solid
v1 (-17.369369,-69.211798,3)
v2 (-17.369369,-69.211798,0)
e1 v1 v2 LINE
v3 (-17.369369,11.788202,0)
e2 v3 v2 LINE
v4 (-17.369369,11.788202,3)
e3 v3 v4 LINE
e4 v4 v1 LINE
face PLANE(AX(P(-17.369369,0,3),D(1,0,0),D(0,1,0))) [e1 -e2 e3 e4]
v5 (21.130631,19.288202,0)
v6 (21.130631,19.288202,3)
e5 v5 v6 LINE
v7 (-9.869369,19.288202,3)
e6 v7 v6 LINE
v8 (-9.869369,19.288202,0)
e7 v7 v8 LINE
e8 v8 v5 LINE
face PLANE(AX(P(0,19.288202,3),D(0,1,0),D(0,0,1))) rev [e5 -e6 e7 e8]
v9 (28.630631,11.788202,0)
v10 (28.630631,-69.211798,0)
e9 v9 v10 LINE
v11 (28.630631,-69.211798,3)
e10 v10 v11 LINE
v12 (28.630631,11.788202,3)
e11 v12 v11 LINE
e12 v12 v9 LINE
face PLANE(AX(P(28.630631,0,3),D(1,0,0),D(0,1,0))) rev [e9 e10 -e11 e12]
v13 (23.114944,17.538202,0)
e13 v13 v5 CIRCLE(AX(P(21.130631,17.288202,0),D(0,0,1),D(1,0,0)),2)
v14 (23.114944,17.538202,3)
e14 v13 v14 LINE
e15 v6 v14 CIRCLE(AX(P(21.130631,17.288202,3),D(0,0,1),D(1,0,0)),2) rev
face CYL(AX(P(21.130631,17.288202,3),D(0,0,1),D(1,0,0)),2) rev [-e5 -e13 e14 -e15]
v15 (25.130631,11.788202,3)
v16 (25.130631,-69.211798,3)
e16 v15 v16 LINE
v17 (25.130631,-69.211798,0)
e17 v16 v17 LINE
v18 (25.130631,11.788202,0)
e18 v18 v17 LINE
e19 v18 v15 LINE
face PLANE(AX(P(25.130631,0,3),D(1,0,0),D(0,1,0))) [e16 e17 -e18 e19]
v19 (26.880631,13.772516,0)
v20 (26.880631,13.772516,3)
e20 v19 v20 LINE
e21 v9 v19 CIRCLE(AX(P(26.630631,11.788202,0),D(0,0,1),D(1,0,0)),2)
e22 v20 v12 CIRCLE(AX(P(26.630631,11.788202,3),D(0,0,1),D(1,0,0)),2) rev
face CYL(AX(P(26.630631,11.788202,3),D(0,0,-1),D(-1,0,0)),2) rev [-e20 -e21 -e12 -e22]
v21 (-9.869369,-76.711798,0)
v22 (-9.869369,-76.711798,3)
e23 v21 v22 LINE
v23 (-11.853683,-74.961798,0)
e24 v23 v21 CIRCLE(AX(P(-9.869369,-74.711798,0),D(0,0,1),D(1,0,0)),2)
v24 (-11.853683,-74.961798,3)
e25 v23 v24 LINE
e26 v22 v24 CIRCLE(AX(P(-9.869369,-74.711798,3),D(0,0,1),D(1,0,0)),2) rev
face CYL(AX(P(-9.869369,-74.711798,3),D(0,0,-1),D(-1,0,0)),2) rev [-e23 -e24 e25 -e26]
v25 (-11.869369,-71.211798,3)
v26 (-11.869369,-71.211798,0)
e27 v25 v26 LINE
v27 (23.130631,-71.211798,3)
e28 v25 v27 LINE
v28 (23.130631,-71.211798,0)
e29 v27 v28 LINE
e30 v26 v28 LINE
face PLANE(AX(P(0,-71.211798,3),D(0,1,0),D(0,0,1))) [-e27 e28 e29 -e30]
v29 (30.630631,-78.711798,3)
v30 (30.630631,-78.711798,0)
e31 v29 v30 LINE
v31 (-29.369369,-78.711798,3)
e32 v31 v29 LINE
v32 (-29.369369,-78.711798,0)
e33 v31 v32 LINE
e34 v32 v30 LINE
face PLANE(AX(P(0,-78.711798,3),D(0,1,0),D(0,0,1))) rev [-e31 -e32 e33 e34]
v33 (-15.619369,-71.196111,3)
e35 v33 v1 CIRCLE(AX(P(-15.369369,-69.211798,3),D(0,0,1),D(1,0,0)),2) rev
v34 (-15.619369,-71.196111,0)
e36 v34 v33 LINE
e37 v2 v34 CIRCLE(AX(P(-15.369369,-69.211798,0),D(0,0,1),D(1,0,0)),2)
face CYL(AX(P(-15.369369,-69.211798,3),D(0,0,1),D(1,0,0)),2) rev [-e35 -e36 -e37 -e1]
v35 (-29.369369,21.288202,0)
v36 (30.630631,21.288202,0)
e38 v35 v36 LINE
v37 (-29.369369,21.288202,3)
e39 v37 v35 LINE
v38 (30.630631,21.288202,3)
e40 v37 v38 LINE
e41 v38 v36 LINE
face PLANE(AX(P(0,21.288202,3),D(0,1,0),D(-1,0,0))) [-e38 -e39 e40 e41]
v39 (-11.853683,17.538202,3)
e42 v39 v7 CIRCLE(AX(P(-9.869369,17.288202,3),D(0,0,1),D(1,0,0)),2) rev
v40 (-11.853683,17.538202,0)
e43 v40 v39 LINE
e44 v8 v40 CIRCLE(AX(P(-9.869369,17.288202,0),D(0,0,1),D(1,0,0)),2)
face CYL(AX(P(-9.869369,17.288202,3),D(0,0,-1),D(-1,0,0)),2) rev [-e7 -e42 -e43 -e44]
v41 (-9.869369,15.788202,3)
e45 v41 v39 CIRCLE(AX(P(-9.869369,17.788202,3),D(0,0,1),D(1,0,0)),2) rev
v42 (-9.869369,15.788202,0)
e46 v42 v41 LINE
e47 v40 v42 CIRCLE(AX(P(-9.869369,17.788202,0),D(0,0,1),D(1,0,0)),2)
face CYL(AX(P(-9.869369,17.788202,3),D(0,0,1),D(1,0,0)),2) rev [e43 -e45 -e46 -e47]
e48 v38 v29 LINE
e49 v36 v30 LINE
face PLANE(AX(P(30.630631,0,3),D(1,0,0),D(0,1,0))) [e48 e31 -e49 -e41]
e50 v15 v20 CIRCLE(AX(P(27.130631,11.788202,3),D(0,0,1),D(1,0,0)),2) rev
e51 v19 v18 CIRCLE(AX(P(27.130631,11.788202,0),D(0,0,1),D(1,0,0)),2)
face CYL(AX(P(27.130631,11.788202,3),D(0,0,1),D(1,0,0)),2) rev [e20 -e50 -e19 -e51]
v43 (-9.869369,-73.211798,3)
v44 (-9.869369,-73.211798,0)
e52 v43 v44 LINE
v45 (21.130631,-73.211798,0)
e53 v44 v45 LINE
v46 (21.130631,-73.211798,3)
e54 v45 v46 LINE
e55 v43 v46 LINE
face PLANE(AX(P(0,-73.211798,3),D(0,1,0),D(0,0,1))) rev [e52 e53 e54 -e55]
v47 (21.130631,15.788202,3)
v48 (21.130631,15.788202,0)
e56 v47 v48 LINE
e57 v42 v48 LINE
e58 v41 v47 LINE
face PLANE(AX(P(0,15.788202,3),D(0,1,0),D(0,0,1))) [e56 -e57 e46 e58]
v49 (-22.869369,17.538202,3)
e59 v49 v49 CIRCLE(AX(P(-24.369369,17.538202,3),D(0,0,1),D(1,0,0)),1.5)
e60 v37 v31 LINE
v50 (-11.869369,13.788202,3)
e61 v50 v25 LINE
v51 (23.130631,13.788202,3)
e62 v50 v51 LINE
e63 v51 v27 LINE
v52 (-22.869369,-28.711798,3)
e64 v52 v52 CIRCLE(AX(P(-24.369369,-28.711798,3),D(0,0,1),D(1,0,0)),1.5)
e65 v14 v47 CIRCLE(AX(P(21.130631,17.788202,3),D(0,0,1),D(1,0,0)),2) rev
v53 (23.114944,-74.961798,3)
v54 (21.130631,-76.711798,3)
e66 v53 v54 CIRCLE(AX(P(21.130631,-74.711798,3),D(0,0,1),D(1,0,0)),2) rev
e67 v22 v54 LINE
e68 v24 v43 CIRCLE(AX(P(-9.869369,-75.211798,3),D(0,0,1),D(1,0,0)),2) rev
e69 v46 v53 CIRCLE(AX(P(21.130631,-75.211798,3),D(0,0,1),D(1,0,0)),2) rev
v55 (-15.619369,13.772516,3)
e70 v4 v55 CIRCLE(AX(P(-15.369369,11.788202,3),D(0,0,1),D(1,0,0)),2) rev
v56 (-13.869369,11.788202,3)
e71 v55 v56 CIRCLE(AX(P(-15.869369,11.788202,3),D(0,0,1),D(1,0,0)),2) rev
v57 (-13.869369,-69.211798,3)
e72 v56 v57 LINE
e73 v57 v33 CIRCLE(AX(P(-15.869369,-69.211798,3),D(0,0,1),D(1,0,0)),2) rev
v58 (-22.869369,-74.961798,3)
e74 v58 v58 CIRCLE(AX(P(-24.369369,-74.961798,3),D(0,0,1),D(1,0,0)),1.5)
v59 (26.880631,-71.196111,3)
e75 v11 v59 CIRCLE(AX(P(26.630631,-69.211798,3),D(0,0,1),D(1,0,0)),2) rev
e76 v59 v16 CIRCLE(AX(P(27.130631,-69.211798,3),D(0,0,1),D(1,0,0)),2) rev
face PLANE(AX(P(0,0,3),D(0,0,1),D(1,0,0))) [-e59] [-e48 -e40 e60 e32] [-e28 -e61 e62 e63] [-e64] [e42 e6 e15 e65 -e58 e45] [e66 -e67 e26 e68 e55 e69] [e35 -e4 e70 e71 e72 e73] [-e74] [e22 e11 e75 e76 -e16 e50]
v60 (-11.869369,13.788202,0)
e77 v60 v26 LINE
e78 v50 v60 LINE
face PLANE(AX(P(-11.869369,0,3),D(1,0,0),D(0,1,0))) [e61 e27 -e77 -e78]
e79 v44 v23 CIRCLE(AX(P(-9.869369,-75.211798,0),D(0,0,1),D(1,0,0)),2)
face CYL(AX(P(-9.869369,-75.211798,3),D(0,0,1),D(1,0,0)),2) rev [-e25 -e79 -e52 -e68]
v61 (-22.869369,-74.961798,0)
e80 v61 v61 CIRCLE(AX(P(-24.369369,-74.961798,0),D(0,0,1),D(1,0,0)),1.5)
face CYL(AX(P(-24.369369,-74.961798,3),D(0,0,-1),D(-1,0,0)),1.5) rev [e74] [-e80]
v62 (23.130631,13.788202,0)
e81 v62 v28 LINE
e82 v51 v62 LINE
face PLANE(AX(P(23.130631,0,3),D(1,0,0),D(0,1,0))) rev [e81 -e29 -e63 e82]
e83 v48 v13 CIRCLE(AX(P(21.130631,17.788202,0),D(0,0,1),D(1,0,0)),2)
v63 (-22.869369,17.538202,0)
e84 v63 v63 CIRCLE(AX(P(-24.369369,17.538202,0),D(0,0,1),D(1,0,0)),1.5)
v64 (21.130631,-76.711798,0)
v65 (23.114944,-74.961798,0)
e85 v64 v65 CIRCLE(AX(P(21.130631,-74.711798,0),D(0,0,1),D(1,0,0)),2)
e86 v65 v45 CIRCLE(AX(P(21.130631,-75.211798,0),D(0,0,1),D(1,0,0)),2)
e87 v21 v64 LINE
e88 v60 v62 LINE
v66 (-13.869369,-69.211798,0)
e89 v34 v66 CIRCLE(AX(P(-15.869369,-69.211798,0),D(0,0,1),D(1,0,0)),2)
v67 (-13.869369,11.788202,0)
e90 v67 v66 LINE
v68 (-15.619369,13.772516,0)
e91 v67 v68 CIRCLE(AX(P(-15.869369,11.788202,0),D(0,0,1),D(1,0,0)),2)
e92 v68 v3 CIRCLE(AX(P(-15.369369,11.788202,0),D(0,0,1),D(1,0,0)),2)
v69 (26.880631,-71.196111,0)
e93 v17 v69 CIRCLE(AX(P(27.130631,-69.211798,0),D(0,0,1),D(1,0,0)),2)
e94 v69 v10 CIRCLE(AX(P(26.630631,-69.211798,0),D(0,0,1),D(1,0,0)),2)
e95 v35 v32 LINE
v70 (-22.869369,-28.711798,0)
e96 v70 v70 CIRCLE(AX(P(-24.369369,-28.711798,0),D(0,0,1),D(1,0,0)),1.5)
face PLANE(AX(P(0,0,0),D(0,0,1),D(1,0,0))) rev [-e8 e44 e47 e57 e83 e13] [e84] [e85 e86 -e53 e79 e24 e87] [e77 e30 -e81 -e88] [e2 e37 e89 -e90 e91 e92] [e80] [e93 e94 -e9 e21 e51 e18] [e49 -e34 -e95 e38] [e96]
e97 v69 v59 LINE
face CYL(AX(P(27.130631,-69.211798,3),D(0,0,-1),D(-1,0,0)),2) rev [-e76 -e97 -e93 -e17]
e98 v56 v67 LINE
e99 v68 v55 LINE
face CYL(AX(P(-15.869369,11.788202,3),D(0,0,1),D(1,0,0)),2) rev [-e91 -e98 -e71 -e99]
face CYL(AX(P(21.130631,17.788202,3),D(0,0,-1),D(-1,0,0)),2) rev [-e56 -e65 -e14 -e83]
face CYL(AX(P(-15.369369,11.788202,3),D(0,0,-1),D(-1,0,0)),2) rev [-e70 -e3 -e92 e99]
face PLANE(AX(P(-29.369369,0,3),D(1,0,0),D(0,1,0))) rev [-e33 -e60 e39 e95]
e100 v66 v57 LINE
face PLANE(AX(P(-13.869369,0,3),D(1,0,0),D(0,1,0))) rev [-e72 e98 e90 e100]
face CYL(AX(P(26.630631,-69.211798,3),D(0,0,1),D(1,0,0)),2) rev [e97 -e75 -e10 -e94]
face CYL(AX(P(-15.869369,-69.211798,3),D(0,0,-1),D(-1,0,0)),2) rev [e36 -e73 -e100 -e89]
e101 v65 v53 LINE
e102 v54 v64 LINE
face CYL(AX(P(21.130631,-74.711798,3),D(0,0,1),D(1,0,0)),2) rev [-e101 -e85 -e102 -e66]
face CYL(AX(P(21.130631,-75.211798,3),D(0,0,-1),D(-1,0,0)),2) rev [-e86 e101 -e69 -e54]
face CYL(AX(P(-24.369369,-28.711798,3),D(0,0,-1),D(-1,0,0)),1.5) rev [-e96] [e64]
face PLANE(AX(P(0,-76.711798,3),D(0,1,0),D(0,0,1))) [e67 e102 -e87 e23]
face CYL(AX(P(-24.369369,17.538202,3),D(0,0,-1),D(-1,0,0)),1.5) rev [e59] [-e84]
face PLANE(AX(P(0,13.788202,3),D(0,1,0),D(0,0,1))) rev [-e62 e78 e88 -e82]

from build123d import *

# Parameters (mm, degrees)
SKETCH2_W           = 60
SKETCH2_H           = 100
SKETCH2_R           = 1.5
SKETCH2_W_2         = 3.5
SKETCH2_H_2         = 85
SKETCH2_W_3         = 35
SKETCH2_H_3         = 3.5
BOSS_EXTRUDE1_DEPTH = 3
FILLET1_R           = 2


with BuildPart() as part:
    # Sketch2 → Boss-Extrude1 (new body)
    with BuildSketch(Plane.XY):
        with Locations((0.630630631, -28.711797537)):
            Rectangle(SKETCH2_W, SKETCH2_H)
        with Locations((-24.369369369, -74.961797537)):
            Circle(SKETCH2_R, mode=Mode.SUBTRACT)
        with Locations((-24.369369369, -28.711797537)):
            Circle(SKETCH2_R, mode=Mode.SUBTRACT)
        with Locations((-15.619369369, -28.711797537)):
            Rectangle(SKETCH2_W_2, SKETCH2_H_2, mode=Mode.SUBTRACT)
        with Locations((5.630630631, -74.961797537)):
            Rectangle(SKETCH2_W_3, SKETCH2_H_3, mode=Mode.SUBTRACT)
        with Locations((26.880630631, -28.711797537)):
            Rectangle(SKETCH2_W_2, SKETCH2_H_2, mode=Mode.SUBTRACT)
        with Locations((-24.369369369, 17.538202463)):
            Circle(SKETCH2_R, mode=Mode.SUBTRACT)
        with Locations((5.630630631, -28.711797537)):
            Rectangle(SKETCH2_W_3, SKETCH2_H_2, mode=Mode.SUBTRACT)
        with Locations((5.630630631, 17.538202463)):
            Rectangle(SKETCH2_W_3, SKETCH2_H_3, mode=Mode.SUBTRACT)
    extrude(amount=BOSS_EXTRUDE1_DEPTH)

    # Fillet1
    # the kernel refuses this fillet: 2 mm, written as the material it adds along each edge
    with BuildSketch(Plane(origin=(-11.869369369, 15.788202463, 0), x_dir=(1, 0, 0), z_dir=(0, 0, 1)), Plane(origin=(23.130630631, 19.288202463, 0), x_dir=(-1, 0, 0), z_dir=(0, 0, 1)), Plane(origin=(-11.869369369, 19.288202463, 0), x_dir=(0, -1, 0), z_dir=(0, 0, 1)), Plane(origin=(-17.369369369, 13.788202463, 0), x_dir=(0, -1, 0), z_dir=(0, 0, 1)), Plane(origin=(25.130630631, 13.788202463, 0), x_dir=(0, -1, 0), z_dir=(0, 0, 1)), Plane(origin=(28.630630631, 13.788202463, 0), x_dir=(-1, 0, 0), z_dir=(0, 0, 1)), Plane(origin=(-13.869369369, 13.788202463, 0), x_dir=(-1, 0, 0), z_dir=(0, 0, 1)), Plane(origin=(-13.869369369, -71.211797537, 0), x_dir=(0, 1, 0), z_dir=(0, 0, 1)), Plane(origin=(25.130630631, -71.211797537, 0), x_dir=(1, 0, 0), z_dir=(0, 0, 1)), Plane(origin=(-11.869369369, -76.711797537, 0), x_dir=(1, 0, 0), z_dir=(0, 0, 1)), Plane(origin=(23.130630631, -73.211797537, 0), x_dir=(-1, 0, 0), z_dir=(0, 0, 1)), Plane(origin=(23.130630631, -76.711797537, 0), x_dir=(0, 1, 0), z_dir=(0, 0, 1))) as fillet1_piece_1:
        with BuildLine():
            CenterArc((FILLET1_R, FILLET1_R), FILLET1_R, 180, 90)
            Line((0, FILLET1_R), (0, 0))
            Line((0, 0), (FILLET1_R, 0))
        make_face()
    extrude(amount=3)
    with BuildSketch(Plane(origin=(23.130630631, 15.788202463, 0), x_dir=(-1, 0, 0), z_dir=(0, 0, 1)), Plane(origin=(28.630630631, -71.211797537, 0), x_dir=(-1, 0, 0), z_dir=(0, 0, 1)), Plane(origin=(-17.369369369, -71.211797537, 0), x_dir=(0, 1, 0), z_dir=(0, 0, 1)), Plane(origin=(-11.869369369, -73.211797537, 0), x_dir=(1, 0, 0), z_dir=(0, 0, 1))) as fillet1_piece_2:
        with BuildLine():
            CenterArc((FILLET1_R, -FILLET1_R), FILLET1_R, 90, 90)
            Line((0, -FILLET1_R), (0, 0))
            Line((0, 0), (FILLET1_R, 0))
        make_face()
    extrude(amount=3)


solid = part.part
